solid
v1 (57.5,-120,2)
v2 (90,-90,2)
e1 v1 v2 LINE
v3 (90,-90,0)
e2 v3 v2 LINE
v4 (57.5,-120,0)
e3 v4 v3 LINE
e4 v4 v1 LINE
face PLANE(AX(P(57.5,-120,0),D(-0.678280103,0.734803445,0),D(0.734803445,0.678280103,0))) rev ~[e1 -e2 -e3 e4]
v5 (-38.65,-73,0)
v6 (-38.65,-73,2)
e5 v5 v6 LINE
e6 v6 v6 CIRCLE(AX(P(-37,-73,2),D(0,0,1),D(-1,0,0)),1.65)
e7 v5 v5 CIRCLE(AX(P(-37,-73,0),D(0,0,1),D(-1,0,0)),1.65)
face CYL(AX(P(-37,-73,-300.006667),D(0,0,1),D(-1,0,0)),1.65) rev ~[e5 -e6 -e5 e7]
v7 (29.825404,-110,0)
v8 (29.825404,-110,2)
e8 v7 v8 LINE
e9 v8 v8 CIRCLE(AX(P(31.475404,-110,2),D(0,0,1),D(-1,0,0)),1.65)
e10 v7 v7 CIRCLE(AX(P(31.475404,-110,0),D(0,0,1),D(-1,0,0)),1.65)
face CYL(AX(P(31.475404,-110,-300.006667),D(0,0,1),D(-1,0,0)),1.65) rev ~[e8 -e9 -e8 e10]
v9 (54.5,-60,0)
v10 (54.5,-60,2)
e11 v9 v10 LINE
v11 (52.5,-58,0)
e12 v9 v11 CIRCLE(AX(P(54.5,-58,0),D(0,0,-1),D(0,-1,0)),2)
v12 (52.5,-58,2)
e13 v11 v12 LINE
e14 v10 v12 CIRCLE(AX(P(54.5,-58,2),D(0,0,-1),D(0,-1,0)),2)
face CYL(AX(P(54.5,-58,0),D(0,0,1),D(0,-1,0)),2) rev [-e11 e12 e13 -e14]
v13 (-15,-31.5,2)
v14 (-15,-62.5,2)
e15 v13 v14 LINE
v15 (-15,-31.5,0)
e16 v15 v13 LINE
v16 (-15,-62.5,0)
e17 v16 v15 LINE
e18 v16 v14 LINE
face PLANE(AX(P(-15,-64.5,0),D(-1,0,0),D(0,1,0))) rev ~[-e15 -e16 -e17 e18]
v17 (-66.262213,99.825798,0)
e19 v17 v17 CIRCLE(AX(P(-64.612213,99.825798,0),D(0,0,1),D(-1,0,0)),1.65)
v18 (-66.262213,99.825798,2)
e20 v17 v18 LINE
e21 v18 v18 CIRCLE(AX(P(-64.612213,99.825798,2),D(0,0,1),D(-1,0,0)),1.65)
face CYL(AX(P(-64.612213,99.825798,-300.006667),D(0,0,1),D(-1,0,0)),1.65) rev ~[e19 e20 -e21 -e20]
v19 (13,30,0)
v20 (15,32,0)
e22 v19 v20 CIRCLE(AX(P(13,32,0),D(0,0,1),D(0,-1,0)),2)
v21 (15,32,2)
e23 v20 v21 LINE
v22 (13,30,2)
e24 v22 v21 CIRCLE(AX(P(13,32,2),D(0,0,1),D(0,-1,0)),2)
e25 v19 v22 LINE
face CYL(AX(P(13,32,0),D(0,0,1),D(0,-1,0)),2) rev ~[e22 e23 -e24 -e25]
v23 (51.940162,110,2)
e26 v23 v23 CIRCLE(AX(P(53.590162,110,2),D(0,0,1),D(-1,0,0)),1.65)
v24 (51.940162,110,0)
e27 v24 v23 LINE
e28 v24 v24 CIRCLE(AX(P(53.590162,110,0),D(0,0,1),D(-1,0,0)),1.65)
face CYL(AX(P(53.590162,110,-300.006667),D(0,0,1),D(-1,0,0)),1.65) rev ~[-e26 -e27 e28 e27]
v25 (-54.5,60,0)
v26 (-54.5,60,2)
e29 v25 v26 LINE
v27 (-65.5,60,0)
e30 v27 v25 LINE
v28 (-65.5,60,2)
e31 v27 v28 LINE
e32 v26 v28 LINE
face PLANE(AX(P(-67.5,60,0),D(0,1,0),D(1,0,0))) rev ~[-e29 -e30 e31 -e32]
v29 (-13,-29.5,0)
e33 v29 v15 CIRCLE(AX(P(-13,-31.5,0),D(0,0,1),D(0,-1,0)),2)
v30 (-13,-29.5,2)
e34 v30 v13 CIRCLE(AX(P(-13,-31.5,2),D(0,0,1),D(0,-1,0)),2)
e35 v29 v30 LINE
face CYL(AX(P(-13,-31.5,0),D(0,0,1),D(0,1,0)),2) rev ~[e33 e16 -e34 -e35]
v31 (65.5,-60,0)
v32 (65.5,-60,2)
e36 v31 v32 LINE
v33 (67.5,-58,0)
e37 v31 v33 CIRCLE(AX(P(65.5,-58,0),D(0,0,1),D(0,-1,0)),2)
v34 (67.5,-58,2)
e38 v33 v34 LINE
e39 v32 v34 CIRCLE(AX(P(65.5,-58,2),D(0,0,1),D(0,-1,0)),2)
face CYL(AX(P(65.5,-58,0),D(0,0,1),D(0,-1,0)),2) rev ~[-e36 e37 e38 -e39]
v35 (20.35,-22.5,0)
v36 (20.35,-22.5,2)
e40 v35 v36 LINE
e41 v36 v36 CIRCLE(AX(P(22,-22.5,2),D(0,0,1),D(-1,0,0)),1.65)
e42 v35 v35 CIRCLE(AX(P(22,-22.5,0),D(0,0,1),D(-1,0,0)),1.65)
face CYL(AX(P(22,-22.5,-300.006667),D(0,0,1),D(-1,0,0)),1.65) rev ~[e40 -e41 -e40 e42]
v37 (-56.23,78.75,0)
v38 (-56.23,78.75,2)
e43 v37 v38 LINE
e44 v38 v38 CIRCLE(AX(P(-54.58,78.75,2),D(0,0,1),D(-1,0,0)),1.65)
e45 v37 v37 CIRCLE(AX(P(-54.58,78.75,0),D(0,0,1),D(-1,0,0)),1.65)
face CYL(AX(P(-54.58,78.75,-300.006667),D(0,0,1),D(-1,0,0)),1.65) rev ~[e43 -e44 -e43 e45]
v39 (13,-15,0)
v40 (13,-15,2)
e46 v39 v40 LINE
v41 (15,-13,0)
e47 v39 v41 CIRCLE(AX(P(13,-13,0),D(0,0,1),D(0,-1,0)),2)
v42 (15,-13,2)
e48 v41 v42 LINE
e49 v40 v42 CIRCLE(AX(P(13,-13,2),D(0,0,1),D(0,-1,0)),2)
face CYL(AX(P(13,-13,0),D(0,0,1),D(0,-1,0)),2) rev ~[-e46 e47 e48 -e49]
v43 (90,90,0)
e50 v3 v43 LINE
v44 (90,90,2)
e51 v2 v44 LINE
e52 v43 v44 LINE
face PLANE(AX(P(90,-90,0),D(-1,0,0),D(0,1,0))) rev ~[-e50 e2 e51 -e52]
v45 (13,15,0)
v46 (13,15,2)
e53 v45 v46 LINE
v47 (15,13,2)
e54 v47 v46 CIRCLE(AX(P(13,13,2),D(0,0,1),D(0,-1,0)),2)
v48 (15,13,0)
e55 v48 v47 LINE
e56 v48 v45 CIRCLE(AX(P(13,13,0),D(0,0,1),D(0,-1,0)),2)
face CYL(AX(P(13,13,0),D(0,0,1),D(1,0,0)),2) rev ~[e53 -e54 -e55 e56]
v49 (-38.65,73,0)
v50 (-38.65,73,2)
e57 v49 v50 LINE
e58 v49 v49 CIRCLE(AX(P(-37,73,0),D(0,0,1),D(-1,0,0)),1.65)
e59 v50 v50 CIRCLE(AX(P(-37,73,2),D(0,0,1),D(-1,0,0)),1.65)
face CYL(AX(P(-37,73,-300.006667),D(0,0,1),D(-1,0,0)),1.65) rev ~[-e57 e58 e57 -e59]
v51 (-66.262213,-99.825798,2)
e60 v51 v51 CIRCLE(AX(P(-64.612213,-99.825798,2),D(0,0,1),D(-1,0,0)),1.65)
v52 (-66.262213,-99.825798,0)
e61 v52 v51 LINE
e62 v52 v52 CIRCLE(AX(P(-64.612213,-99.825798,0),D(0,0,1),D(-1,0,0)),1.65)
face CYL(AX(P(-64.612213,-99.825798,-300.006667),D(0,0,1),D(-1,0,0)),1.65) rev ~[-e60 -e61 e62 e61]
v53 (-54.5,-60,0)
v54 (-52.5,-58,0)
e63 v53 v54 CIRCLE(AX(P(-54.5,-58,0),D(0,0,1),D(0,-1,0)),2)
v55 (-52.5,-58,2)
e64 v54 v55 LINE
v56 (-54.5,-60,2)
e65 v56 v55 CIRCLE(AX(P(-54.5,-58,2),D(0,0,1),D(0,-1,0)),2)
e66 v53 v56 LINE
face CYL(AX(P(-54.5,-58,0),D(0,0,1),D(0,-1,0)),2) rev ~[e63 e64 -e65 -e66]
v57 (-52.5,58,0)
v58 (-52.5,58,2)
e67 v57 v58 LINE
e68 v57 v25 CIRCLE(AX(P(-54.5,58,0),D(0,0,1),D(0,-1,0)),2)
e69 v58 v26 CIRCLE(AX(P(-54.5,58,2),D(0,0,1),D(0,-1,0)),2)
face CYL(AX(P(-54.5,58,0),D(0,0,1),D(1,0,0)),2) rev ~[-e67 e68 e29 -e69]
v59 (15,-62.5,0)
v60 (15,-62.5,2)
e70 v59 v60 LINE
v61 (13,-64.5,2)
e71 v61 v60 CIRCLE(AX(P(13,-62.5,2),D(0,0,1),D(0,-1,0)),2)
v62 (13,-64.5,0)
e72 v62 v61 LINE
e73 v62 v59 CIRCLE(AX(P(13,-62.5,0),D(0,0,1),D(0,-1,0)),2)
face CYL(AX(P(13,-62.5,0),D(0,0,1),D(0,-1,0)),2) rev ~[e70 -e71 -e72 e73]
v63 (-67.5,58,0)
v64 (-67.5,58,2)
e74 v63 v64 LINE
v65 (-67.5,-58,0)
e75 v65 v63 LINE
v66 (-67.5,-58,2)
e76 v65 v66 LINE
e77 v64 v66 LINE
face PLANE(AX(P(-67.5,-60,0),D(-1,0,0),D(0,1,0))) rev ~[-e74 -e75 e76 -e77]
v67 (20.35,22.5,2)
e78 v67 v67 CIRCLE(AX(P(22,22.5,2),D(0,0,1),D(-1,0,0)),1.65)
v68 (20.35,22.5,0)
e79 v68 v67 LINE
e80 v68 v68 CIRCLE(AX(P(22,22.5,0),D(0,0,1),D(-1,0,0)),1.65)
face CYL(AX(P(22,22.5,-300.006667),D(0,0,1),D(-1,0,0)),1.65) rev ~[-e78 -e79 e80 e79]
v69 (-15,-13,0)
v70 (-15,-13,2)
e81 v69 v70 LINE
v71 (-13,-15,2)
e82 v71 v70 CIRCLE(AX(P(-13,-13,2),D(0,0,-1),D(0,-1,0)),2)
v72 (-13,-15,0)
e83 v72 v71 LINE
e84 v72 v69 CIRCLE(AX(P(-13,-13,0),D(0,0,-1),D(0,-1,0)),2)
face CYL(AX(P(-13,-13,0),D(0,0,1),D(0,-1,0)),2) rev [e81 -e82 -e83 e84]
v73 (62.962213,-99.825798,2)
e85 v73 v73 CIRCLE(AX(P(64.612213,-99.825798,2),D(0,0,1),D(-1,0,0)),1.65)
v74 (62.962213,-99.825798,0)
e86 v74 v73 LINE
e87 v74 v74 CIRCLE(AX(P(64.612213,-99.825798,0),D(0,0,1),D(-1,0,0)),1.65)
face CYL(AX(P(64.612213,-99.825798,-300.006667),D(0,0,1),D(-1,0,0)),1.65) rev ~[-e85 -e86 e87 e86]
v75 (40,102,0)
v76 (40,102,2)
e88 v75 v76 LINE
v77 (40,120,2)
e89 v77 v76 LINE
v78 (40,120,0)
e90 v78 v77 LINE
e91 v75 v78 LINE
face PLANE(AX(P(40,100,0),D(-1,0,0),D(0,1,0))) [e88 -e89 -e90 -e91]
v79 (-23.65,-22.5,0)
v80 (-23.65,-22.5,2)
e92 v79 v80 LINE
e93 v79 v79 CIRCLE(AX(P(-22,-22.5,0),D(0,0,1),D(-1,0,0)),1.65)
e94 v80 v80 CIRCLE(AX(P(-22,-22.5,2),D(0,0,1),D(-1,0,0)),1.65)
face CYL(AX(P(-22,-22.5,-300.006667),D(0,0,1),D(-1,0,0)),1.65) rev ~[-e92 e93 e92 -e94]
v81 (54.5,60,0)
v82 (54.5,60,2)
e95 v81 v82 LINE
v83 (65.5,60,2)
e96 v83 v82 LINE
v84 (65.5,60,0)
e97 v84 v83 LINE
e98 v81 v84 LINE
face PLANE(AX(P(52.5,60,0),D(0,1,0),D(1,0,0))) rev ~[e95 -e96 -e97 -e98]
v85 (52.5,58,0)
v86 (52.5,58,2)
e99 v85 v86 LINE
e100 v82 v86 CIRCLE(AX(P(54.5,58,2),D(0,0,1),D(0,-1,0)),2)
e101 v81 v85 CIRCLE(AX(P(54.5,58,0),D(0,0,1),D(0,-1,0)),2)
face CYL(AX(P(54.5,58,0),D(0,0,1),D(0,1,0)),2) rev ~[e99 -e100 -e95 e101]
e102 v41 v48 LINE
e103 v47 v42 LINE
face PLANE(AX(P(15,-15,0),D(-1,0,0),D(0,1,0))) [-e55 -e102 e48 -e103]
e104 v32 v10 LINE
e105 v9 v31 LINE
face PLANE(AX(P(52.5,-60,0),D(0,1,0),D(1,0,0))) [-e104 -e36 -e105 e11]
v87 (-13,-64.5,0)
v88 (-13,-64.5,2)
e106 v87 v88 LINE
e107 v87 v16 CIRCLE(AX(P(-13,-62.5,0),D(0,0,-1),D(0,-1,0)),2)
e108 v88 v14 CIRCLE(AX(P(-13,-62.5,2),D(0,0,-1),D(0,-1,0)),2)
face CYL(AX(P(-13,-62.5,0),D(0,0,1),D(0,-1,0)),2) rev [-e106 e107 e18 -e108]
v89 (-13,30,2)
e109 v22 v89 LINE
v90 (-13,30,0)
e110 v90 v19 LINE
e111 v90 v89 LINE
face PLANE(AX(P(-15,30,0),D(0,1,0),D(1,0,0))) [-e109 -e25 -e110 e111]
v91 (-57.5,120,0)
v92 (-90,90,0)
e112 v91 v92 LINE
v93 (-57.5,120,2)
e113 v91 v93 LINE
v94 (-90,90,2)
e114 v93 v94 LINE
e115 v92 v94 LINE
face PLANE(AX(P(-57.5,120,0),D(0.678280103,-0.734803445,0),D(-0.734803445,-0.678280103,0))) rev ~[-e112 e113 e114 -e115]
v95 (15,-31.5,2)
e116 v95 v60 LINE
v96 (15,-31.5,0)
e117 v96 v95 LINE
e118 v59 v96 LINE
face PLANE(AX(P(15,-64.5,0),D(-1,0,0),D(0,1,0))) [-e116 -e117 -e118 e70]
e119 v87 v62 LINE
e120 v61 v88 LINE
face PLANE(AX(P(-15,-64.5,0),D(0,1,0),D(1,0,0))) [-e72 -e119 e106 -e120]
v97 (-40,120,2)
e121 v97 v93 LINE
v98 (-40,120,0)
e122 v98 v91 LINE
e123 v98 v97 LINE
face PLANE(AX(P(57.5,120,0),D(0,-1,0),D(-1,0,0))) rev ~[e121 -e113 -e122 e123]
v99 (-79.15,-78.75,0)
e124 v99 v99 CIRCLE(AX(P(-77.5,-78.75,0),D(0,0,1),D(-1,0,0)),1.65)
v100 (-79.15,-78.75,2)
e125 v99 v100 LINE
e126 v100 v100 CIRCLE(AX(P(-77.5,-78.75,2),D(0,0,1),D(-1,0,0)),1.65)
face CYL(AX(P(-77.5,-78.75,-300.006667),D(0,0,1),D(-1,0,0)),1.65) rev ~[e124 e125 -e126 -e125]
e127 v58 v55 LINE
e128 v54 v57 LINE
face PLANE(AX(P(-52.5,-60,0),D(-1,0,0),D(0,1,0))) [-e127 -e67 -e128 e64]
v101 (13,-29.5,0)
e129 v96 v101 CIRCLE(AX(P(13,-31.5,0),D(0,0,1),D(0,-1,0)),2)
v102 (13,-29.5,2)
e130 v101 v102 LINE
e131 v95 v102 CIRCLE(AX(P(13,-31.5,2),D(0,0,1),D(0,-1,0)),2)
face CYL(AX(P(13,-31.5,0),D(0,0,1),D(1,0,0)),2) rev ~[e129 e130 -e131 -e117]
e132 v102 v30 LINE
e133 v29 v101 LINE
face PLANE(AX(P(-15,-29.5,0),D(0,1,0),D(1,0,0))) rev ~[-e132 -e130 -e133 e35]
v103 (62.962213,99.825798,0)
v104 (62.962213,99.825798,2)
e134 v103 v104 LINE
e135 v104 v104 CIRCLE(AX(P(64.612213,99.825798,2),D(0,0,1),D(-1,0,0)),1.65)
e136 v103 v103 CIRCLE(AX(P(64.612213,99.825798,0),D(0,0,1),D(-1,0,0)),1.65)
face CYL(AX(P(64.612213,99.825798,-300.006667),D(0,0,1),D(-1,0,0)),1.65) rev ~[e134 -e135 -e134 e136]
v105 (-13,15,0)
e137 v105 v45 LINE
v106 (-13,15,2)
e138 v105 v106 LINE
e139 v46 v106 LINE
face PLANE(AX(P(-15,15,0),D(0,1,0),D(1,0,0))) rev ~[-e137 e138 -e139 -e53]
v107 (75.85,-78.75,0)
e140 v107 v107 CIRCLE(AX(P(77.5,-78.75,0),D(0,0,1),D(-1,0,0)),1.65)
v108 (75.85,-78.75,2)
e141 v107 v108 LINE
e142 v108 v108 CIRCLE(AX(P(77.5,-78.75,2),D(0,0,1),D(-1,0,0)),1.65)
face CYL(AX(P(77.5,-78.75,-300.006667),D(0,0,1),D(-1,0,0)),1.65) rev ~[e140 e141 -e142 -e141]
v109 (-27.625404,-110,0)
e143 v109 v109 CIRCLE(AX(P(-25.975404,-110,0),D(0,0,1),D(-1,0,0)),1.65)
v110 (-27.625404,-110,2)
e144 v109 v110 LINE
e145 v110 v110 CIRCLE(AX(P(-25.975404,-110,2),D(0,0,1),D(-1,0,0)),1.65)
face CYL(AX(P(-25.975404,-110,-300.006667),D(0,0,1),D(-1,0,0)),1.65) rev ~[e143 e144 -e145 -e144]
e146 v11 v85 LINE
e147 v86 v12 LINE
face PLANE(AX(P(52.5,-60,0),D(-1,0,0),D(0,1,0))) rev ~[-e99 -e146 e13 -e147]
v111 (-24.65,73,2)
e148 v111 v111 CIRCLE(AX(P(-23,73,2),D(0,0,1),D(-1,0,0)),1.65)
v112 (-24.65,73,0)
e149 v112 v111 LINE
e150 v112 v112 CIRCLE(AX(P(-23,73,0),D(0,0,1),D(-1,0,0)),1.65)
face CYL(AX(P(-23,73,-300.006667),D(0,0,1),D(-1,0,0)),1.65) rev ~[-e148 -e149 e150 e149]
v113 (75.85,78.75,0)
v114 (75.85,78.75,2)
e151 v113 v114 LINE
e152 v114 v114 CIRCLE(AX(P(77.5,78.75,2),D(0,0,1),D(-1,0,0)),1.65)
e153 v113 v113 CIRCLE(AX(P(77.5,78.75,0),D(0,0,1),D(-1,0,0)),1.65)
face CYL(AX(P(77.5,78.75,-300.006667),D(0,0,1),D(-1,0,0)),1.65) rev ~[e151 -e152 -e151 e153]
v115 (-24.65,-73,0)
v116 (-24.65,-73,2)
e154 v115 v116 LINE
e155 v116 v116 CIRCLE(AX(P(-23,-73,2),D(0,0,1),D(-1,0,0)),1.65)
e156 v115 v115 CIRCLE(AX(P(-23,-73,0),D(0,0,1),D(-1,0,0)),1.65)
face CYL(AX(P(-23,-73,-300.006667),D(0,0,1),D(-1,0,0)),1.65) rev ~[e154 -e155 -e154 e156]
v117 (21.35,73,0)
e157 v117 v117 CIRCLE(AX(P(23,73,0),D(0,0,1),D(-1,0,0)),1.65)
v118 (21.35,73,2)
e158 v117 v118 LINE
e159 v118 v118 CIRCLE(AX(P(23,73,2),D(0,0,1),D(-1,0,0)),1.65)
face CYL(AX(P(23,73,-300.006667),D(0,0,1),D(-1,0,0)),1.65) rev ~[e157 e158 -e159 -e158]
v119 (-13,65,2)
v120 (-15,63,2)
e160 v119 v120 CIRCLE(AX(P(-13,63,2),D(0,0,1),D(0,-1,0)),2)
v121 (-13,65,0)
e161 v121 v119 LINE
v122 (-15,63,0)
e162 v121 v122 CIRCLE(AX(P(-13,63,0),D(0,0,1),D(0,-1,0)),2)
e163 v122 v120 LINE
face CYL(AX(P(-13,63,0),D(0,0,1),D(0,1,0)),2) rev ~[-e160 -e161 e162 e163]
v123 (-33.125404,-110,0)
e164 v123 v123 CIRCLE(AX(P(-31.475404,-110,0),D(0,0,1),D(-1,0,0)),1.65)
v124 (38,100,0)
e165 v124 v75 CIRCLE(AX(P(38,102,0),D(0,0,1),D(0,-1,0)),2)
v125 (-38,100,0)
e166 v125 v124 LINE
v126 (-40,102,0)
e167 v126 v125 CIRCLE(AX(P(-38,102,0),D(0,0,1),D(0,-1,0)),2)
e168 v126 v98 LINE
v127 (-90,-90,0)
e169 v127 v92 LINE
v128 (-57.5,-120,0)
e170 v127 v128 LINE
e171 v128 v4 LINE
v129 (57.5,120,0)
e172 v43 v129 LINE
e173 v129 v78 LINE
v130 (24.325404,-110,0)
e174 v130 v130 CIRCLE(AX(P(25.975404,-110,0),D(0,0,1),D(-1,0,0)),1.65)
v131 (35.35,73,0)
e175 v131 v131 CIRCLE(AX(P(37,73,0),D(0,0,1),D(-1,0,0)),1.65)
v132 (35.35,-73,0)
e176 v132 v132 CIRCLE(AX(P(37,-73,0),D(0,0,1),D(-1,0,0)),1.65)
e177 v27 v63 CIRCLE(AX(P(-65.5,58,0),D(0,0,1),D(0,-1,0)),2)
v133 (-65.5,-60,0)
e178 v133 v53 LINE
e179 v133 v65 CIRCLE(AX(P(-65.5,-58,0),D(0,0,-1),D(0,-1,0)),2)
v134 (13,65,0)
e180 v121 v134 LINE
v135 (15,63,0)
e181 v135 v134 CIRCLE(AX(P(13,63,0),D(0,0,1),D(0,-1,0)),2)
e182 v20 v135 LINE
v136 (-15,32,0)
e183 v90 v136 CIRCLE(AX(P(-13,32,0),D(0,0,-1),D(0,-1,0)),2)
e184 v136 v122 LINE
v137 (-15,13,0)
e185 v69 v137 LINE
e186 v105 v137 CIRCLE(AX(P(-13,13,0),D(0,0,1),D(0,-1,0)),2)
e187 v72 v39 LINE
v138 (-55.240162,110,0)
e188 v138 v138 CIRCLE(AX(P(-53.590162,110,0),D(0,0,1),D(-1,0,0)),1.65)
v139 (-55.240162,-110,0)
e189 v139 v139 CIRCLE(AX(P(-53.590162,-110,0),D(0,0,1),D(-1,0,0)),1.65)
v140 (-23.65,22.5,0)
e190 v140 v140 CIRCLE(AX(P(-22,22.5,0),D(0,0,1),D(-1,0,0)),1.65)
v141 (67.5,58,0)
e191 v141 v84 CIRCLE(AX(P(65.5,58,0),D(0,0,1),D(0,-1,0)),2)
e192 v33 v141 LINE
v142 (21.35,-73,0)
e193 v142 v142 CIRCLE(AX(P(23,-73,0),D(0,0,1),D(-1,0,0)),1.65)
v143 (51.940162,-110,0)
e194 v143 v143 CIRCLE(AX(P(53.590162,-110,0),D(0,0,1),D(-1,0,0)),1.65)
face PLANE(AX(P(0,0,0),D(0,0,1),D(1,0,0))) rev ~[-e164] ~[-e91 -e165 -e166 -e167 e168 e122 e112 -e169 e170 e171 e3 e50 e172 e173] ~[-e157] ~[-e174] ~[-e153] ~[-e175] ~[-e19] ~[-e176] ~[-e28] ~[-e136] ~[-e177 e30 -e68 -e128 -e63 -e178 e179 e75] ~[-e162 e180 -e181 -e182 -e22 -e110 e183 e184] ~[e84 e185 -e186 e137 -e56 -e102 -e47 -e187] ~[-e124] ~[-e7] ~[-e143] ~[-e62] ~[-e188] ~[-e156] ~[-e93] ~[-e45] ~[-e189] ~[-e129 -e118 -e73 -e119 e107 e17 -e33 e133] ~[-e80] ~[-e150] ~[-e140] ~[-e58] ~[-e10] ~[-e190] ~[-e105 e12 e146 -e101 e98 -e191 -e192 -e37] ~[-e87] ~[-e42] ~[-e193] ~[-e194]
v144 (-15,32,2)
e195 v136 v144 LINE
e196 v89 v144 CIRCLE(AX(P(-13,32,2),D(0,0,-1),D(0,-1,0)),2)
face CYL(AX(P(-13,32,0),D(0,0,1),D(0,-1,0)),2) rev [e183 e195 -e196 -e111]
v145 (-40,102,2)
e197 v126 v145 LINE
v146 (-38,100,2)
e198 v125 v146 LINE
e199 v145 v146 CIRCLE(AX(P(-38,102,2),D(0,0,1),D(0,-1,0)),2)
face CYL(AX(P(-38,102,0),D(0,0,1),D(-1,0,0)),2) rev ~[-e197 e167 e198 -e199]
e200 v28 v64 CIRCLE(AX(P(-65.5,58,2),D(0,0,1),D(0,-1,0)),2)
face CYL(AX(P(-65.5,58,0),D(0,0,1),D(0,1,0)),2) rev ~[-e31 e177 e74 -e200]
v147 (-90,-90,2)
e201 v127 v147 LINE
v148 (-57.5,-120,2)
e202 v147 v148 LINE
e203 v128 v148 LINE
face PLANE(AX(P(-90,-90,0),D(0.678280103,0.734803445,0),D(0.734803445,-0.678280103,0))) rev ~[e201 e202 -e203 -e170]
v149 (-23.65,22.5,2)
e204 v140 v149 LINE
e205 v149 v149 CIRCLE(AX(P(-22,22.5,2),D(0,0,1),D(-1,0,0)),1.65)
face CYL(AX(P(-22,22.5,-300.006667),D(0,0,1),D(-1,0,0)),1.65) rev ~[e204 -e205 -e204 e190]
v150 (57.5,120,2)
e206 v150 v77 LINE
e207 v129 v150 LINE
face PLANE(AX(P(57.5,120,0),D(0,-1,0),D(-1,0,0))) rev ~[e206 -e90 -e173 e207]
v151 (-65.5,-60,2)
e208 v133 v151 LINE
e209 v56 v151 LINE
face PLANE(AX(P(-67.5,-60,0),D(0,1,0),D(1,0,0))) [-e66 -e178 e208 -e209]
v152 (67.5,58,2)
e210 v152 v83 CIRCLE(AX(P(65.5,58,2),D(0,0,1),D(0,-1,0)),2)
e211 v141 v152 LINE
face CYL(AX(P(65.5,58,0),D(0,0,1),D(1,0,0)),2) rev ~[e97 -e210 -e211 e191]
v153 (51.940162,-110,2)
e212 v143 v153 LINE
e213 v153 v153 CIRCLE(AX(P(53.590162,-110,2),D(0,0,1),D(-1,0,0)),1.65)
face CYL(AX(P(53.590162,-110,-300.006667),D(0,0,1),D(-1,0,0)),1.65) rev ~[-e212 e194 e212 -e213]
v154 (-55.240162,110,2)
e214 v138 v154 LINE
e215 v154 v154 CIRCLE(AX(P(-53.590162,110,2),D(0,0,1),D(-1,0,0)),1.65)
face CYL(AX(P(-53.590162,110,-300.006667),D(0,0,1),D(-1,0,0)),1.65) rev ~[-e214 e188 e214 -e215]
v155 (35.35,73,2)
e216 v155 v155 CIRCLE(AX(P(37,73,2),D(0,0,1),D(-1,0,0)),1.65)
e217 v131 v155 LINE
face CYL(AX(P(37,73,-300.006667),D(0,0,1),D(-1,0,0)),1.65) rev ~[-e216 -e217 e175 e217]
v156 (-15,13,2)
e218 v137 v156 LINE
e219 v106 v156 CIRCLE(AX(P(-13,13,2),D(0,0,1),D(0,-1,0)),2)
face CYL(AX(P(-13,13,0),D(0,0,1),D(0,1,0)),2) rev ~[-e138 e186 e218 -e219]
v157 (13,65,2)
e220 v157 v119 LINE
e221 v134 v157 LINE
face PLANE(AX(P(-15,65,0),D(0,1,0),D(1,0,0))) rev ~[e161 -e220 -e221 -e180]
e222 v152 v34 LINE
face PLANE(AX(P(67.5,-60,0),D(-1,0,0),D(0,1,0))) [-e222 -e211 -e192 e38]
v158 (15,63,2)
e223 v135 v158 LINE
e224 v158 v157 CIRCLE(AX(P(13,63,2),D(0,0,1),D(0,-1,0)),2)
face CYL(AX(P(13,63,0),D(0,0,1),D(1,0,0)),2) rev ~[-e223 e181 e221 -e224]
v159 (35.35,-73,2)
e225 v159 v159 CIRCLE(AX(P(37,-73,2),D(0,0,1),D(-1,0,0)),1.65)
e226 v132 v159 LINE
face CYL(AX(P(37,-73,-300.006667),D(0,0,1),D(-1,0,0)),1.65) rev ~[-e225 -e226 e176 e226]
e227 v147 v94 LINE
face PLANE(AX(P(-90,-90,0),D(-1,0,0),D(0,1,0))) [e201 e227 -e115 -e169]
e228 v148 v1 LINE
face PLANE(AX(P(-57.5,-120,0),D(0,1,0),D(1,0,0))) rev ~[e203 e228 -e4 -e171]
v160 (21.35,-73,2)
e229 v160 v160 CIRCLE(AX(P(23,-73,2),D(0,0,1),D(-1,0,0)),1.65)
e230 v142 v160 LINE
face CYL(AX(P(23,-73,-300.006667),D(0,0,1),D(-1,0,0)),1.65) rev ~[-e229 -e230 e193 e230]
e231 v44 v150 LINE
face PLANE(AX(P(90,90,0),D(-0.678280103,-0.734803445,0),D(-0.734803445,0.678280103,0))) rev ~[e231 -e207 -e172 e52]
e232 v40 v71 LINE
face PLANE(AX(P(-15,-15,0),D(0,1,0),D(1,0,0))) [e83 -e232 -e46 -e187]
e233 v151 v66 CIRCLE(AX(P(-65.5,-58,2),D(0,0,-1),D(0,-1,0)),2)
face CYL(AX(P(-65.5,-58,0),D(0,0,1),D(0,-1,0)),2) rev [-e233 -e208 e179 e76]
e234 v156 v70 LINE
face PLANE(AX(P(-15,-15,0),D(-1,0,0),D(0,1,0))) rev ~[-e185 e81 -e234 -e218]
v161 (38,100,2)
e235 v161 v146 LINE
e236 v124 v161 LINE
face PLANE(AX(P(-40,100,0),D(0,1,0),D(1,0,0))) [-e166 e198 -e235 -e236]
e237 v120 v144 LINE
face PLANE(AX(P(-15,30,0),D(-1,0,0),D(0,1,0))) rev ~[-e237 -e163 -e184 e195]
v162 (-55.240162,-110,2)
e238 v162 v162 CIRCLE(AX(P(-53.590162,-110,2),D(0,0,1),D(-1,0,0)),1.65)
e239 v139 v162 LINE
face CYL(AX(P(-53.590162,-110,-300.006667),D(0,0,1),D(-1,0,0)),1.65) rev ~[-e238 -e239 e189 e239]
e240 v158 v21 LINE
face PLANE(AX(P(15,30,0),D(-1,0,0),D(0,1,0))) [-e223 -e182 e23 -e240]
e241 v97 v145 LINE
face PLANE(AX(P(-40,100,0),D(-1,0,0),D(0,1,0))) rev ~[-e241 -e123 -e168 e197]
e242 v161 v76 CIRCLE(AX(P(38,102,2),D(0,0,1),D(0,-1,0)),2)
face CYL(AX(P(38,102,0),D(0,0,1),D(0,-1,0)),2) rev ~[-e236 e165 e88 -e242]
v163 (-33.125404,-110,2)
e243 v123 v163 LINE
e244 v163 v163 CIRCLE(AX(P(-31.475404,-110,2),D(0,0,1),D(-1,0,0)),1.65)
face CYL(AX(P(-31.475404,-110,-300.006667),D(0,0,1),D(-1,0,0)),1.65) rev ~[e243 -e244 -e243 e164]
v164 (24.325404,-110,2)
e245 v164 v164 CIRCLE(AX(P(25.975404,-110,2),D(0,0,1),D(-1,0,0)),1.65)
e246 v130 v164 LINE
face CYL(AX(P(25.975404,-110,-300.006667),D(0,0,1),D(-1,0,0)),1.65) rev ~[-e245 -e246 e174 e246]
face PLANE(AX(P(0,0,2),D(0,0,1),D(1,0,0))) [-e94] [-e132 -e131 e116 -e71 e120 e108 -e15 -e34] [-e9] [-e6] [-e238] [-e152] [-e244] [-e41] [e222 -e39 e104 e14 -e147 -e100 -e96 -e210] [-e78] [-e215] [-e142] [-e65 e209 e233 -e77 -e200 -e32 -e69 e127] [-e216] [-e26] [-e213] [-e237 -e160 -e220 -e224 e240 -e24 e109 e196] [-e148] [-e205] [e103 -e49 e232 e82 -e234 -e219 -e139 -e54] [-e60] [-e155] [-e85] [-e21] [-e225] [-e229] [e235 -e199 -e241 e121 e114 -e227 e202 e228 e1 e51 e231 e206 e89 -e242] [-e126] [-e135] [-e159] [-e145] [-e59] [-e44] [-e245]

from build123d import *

# Parameters (mm, degrees)
F0_W     = 180
F0_H     = 180
F1_DEPTH = 2
F2_D     = 3.3
F4_D     = 3.3
F6_D     = 3.3
F7_W     = 30
F7_H     = 30
F7_H_2   = 35
F7_W_2   = 15
F7_H_3   = 120
F7_W_3   = 80
F7_H_4   = 20
F8_DEPTH = 2.001
F9_R     = 2


with BuildPart() as f1:
    # F0 (on Top) → F1 (new body)
    with BuildSketch(Plane.XY):
        Rectangle(F0_W, F0_H)
        Polygon((-90, 90), (90, 90), (57.5, 120), (-57.5, 120), align=None)
        Polygon((57.5, -120), (90, -90), (-90, -90), (-57.5, -120), align=None)
    extrude(amount=F1_DEPTH)

    # F2 (through all)
    with Locations(Plane(origin=(0, 0, 0), x_dir=(1, 0, 0), z_dir=(0, 0, -1))):
        with Locations((-23, -73), (23, -73), (23, 73), (-23, 73), (-54.58, -78.75), (37, -73), (77.5, -78.75), (-77.5, 78.75), (-37, 73), (77.5, 78.75), (37, 73), (-37, -73)):
            Hole(F2_D / 2)

    # F4 (through all)
    with Locations(Plane(origin=(0, 0, 0), x_dir=(1, 0, 0), z_dir=(0, 0, -1))):
        with Locations((-64.6122133253, 99.825798459), (-53.5901616559, 110), (53.5901616559, 110), (64.6122133253, 99.825798459), (64.6122133253, -99.825798459), (53.5901616559, -110), (-53.5901616559, -110), (-64.6122133253, -99.825798459)):
            Hole(F4_D / 2)

    # F6 (through all)
    with Locations(Plane(origin=(0, 0, 0), x_dir=(1, 0, 0), z_dir=(0, 0, -1))):
        with Locations((-22, -22.5), (22, -22.5), (22, 22.5), (-22, 22.5), (25.9754041397, 110), (31.4754041397, 110), (-25.9754041397, 110), (-31.4754041397, 110)):
            Hole(F6_D / 2)

    # F7 (on Top) → F8 (cut, through all)
    with BuildSketch(Plane.XY):
        Rectangle(F7_W, F7_H)
        with Locations((0, 47.5)):
            Rectangle(F7_W, F7_H_2)
        with Locations((0, -47)):
            Rectangle(F7_W, F7_H_2)
        with Locations((-60, 0)):
            Rectangle(F7_W_2, F7_H_3)
        with Locations((60, 0)):
            Rectangle(F7_W_2, F7_H_3)
        with Locations((0, 110)):
            Rectangle(F7_W_3, F7_H_4)
    extrude(amount=F8_DEPTH, mode=Mode.SUBTRACT)

    # F9
    f9_edges = [f1.edges().sort_by_distance(p)[0] for p in [
        (-52.5, -60, 1),
        (-67.5, -60, 1),
        (-52.5, 60, 1),
        (15, 65, 1),
        (15, 15, 1),
        (15, -29.5, 1),
        (67.5, 60, 1),
        (15, 30, 1),
        (15, -15, 1),
        (67.5, -60, 1),
        (40, 100, 1),
        (15, -64.5, 1),
        (-67.5, 60, 1),
        (-15, 65, 1),
        (-15, 15, 1),
        (-15, -29.5, 1),
        (52.5, -60, 1),
        (-15, -64.5, 1),
        (-40, 100, 1),
        (-15, -15, 1),
        (-15, 30, 1),
        (52.5, 60, 1),
    ]]
    fillet(f9_edges, radius=F9_R)


solid = f1.part
